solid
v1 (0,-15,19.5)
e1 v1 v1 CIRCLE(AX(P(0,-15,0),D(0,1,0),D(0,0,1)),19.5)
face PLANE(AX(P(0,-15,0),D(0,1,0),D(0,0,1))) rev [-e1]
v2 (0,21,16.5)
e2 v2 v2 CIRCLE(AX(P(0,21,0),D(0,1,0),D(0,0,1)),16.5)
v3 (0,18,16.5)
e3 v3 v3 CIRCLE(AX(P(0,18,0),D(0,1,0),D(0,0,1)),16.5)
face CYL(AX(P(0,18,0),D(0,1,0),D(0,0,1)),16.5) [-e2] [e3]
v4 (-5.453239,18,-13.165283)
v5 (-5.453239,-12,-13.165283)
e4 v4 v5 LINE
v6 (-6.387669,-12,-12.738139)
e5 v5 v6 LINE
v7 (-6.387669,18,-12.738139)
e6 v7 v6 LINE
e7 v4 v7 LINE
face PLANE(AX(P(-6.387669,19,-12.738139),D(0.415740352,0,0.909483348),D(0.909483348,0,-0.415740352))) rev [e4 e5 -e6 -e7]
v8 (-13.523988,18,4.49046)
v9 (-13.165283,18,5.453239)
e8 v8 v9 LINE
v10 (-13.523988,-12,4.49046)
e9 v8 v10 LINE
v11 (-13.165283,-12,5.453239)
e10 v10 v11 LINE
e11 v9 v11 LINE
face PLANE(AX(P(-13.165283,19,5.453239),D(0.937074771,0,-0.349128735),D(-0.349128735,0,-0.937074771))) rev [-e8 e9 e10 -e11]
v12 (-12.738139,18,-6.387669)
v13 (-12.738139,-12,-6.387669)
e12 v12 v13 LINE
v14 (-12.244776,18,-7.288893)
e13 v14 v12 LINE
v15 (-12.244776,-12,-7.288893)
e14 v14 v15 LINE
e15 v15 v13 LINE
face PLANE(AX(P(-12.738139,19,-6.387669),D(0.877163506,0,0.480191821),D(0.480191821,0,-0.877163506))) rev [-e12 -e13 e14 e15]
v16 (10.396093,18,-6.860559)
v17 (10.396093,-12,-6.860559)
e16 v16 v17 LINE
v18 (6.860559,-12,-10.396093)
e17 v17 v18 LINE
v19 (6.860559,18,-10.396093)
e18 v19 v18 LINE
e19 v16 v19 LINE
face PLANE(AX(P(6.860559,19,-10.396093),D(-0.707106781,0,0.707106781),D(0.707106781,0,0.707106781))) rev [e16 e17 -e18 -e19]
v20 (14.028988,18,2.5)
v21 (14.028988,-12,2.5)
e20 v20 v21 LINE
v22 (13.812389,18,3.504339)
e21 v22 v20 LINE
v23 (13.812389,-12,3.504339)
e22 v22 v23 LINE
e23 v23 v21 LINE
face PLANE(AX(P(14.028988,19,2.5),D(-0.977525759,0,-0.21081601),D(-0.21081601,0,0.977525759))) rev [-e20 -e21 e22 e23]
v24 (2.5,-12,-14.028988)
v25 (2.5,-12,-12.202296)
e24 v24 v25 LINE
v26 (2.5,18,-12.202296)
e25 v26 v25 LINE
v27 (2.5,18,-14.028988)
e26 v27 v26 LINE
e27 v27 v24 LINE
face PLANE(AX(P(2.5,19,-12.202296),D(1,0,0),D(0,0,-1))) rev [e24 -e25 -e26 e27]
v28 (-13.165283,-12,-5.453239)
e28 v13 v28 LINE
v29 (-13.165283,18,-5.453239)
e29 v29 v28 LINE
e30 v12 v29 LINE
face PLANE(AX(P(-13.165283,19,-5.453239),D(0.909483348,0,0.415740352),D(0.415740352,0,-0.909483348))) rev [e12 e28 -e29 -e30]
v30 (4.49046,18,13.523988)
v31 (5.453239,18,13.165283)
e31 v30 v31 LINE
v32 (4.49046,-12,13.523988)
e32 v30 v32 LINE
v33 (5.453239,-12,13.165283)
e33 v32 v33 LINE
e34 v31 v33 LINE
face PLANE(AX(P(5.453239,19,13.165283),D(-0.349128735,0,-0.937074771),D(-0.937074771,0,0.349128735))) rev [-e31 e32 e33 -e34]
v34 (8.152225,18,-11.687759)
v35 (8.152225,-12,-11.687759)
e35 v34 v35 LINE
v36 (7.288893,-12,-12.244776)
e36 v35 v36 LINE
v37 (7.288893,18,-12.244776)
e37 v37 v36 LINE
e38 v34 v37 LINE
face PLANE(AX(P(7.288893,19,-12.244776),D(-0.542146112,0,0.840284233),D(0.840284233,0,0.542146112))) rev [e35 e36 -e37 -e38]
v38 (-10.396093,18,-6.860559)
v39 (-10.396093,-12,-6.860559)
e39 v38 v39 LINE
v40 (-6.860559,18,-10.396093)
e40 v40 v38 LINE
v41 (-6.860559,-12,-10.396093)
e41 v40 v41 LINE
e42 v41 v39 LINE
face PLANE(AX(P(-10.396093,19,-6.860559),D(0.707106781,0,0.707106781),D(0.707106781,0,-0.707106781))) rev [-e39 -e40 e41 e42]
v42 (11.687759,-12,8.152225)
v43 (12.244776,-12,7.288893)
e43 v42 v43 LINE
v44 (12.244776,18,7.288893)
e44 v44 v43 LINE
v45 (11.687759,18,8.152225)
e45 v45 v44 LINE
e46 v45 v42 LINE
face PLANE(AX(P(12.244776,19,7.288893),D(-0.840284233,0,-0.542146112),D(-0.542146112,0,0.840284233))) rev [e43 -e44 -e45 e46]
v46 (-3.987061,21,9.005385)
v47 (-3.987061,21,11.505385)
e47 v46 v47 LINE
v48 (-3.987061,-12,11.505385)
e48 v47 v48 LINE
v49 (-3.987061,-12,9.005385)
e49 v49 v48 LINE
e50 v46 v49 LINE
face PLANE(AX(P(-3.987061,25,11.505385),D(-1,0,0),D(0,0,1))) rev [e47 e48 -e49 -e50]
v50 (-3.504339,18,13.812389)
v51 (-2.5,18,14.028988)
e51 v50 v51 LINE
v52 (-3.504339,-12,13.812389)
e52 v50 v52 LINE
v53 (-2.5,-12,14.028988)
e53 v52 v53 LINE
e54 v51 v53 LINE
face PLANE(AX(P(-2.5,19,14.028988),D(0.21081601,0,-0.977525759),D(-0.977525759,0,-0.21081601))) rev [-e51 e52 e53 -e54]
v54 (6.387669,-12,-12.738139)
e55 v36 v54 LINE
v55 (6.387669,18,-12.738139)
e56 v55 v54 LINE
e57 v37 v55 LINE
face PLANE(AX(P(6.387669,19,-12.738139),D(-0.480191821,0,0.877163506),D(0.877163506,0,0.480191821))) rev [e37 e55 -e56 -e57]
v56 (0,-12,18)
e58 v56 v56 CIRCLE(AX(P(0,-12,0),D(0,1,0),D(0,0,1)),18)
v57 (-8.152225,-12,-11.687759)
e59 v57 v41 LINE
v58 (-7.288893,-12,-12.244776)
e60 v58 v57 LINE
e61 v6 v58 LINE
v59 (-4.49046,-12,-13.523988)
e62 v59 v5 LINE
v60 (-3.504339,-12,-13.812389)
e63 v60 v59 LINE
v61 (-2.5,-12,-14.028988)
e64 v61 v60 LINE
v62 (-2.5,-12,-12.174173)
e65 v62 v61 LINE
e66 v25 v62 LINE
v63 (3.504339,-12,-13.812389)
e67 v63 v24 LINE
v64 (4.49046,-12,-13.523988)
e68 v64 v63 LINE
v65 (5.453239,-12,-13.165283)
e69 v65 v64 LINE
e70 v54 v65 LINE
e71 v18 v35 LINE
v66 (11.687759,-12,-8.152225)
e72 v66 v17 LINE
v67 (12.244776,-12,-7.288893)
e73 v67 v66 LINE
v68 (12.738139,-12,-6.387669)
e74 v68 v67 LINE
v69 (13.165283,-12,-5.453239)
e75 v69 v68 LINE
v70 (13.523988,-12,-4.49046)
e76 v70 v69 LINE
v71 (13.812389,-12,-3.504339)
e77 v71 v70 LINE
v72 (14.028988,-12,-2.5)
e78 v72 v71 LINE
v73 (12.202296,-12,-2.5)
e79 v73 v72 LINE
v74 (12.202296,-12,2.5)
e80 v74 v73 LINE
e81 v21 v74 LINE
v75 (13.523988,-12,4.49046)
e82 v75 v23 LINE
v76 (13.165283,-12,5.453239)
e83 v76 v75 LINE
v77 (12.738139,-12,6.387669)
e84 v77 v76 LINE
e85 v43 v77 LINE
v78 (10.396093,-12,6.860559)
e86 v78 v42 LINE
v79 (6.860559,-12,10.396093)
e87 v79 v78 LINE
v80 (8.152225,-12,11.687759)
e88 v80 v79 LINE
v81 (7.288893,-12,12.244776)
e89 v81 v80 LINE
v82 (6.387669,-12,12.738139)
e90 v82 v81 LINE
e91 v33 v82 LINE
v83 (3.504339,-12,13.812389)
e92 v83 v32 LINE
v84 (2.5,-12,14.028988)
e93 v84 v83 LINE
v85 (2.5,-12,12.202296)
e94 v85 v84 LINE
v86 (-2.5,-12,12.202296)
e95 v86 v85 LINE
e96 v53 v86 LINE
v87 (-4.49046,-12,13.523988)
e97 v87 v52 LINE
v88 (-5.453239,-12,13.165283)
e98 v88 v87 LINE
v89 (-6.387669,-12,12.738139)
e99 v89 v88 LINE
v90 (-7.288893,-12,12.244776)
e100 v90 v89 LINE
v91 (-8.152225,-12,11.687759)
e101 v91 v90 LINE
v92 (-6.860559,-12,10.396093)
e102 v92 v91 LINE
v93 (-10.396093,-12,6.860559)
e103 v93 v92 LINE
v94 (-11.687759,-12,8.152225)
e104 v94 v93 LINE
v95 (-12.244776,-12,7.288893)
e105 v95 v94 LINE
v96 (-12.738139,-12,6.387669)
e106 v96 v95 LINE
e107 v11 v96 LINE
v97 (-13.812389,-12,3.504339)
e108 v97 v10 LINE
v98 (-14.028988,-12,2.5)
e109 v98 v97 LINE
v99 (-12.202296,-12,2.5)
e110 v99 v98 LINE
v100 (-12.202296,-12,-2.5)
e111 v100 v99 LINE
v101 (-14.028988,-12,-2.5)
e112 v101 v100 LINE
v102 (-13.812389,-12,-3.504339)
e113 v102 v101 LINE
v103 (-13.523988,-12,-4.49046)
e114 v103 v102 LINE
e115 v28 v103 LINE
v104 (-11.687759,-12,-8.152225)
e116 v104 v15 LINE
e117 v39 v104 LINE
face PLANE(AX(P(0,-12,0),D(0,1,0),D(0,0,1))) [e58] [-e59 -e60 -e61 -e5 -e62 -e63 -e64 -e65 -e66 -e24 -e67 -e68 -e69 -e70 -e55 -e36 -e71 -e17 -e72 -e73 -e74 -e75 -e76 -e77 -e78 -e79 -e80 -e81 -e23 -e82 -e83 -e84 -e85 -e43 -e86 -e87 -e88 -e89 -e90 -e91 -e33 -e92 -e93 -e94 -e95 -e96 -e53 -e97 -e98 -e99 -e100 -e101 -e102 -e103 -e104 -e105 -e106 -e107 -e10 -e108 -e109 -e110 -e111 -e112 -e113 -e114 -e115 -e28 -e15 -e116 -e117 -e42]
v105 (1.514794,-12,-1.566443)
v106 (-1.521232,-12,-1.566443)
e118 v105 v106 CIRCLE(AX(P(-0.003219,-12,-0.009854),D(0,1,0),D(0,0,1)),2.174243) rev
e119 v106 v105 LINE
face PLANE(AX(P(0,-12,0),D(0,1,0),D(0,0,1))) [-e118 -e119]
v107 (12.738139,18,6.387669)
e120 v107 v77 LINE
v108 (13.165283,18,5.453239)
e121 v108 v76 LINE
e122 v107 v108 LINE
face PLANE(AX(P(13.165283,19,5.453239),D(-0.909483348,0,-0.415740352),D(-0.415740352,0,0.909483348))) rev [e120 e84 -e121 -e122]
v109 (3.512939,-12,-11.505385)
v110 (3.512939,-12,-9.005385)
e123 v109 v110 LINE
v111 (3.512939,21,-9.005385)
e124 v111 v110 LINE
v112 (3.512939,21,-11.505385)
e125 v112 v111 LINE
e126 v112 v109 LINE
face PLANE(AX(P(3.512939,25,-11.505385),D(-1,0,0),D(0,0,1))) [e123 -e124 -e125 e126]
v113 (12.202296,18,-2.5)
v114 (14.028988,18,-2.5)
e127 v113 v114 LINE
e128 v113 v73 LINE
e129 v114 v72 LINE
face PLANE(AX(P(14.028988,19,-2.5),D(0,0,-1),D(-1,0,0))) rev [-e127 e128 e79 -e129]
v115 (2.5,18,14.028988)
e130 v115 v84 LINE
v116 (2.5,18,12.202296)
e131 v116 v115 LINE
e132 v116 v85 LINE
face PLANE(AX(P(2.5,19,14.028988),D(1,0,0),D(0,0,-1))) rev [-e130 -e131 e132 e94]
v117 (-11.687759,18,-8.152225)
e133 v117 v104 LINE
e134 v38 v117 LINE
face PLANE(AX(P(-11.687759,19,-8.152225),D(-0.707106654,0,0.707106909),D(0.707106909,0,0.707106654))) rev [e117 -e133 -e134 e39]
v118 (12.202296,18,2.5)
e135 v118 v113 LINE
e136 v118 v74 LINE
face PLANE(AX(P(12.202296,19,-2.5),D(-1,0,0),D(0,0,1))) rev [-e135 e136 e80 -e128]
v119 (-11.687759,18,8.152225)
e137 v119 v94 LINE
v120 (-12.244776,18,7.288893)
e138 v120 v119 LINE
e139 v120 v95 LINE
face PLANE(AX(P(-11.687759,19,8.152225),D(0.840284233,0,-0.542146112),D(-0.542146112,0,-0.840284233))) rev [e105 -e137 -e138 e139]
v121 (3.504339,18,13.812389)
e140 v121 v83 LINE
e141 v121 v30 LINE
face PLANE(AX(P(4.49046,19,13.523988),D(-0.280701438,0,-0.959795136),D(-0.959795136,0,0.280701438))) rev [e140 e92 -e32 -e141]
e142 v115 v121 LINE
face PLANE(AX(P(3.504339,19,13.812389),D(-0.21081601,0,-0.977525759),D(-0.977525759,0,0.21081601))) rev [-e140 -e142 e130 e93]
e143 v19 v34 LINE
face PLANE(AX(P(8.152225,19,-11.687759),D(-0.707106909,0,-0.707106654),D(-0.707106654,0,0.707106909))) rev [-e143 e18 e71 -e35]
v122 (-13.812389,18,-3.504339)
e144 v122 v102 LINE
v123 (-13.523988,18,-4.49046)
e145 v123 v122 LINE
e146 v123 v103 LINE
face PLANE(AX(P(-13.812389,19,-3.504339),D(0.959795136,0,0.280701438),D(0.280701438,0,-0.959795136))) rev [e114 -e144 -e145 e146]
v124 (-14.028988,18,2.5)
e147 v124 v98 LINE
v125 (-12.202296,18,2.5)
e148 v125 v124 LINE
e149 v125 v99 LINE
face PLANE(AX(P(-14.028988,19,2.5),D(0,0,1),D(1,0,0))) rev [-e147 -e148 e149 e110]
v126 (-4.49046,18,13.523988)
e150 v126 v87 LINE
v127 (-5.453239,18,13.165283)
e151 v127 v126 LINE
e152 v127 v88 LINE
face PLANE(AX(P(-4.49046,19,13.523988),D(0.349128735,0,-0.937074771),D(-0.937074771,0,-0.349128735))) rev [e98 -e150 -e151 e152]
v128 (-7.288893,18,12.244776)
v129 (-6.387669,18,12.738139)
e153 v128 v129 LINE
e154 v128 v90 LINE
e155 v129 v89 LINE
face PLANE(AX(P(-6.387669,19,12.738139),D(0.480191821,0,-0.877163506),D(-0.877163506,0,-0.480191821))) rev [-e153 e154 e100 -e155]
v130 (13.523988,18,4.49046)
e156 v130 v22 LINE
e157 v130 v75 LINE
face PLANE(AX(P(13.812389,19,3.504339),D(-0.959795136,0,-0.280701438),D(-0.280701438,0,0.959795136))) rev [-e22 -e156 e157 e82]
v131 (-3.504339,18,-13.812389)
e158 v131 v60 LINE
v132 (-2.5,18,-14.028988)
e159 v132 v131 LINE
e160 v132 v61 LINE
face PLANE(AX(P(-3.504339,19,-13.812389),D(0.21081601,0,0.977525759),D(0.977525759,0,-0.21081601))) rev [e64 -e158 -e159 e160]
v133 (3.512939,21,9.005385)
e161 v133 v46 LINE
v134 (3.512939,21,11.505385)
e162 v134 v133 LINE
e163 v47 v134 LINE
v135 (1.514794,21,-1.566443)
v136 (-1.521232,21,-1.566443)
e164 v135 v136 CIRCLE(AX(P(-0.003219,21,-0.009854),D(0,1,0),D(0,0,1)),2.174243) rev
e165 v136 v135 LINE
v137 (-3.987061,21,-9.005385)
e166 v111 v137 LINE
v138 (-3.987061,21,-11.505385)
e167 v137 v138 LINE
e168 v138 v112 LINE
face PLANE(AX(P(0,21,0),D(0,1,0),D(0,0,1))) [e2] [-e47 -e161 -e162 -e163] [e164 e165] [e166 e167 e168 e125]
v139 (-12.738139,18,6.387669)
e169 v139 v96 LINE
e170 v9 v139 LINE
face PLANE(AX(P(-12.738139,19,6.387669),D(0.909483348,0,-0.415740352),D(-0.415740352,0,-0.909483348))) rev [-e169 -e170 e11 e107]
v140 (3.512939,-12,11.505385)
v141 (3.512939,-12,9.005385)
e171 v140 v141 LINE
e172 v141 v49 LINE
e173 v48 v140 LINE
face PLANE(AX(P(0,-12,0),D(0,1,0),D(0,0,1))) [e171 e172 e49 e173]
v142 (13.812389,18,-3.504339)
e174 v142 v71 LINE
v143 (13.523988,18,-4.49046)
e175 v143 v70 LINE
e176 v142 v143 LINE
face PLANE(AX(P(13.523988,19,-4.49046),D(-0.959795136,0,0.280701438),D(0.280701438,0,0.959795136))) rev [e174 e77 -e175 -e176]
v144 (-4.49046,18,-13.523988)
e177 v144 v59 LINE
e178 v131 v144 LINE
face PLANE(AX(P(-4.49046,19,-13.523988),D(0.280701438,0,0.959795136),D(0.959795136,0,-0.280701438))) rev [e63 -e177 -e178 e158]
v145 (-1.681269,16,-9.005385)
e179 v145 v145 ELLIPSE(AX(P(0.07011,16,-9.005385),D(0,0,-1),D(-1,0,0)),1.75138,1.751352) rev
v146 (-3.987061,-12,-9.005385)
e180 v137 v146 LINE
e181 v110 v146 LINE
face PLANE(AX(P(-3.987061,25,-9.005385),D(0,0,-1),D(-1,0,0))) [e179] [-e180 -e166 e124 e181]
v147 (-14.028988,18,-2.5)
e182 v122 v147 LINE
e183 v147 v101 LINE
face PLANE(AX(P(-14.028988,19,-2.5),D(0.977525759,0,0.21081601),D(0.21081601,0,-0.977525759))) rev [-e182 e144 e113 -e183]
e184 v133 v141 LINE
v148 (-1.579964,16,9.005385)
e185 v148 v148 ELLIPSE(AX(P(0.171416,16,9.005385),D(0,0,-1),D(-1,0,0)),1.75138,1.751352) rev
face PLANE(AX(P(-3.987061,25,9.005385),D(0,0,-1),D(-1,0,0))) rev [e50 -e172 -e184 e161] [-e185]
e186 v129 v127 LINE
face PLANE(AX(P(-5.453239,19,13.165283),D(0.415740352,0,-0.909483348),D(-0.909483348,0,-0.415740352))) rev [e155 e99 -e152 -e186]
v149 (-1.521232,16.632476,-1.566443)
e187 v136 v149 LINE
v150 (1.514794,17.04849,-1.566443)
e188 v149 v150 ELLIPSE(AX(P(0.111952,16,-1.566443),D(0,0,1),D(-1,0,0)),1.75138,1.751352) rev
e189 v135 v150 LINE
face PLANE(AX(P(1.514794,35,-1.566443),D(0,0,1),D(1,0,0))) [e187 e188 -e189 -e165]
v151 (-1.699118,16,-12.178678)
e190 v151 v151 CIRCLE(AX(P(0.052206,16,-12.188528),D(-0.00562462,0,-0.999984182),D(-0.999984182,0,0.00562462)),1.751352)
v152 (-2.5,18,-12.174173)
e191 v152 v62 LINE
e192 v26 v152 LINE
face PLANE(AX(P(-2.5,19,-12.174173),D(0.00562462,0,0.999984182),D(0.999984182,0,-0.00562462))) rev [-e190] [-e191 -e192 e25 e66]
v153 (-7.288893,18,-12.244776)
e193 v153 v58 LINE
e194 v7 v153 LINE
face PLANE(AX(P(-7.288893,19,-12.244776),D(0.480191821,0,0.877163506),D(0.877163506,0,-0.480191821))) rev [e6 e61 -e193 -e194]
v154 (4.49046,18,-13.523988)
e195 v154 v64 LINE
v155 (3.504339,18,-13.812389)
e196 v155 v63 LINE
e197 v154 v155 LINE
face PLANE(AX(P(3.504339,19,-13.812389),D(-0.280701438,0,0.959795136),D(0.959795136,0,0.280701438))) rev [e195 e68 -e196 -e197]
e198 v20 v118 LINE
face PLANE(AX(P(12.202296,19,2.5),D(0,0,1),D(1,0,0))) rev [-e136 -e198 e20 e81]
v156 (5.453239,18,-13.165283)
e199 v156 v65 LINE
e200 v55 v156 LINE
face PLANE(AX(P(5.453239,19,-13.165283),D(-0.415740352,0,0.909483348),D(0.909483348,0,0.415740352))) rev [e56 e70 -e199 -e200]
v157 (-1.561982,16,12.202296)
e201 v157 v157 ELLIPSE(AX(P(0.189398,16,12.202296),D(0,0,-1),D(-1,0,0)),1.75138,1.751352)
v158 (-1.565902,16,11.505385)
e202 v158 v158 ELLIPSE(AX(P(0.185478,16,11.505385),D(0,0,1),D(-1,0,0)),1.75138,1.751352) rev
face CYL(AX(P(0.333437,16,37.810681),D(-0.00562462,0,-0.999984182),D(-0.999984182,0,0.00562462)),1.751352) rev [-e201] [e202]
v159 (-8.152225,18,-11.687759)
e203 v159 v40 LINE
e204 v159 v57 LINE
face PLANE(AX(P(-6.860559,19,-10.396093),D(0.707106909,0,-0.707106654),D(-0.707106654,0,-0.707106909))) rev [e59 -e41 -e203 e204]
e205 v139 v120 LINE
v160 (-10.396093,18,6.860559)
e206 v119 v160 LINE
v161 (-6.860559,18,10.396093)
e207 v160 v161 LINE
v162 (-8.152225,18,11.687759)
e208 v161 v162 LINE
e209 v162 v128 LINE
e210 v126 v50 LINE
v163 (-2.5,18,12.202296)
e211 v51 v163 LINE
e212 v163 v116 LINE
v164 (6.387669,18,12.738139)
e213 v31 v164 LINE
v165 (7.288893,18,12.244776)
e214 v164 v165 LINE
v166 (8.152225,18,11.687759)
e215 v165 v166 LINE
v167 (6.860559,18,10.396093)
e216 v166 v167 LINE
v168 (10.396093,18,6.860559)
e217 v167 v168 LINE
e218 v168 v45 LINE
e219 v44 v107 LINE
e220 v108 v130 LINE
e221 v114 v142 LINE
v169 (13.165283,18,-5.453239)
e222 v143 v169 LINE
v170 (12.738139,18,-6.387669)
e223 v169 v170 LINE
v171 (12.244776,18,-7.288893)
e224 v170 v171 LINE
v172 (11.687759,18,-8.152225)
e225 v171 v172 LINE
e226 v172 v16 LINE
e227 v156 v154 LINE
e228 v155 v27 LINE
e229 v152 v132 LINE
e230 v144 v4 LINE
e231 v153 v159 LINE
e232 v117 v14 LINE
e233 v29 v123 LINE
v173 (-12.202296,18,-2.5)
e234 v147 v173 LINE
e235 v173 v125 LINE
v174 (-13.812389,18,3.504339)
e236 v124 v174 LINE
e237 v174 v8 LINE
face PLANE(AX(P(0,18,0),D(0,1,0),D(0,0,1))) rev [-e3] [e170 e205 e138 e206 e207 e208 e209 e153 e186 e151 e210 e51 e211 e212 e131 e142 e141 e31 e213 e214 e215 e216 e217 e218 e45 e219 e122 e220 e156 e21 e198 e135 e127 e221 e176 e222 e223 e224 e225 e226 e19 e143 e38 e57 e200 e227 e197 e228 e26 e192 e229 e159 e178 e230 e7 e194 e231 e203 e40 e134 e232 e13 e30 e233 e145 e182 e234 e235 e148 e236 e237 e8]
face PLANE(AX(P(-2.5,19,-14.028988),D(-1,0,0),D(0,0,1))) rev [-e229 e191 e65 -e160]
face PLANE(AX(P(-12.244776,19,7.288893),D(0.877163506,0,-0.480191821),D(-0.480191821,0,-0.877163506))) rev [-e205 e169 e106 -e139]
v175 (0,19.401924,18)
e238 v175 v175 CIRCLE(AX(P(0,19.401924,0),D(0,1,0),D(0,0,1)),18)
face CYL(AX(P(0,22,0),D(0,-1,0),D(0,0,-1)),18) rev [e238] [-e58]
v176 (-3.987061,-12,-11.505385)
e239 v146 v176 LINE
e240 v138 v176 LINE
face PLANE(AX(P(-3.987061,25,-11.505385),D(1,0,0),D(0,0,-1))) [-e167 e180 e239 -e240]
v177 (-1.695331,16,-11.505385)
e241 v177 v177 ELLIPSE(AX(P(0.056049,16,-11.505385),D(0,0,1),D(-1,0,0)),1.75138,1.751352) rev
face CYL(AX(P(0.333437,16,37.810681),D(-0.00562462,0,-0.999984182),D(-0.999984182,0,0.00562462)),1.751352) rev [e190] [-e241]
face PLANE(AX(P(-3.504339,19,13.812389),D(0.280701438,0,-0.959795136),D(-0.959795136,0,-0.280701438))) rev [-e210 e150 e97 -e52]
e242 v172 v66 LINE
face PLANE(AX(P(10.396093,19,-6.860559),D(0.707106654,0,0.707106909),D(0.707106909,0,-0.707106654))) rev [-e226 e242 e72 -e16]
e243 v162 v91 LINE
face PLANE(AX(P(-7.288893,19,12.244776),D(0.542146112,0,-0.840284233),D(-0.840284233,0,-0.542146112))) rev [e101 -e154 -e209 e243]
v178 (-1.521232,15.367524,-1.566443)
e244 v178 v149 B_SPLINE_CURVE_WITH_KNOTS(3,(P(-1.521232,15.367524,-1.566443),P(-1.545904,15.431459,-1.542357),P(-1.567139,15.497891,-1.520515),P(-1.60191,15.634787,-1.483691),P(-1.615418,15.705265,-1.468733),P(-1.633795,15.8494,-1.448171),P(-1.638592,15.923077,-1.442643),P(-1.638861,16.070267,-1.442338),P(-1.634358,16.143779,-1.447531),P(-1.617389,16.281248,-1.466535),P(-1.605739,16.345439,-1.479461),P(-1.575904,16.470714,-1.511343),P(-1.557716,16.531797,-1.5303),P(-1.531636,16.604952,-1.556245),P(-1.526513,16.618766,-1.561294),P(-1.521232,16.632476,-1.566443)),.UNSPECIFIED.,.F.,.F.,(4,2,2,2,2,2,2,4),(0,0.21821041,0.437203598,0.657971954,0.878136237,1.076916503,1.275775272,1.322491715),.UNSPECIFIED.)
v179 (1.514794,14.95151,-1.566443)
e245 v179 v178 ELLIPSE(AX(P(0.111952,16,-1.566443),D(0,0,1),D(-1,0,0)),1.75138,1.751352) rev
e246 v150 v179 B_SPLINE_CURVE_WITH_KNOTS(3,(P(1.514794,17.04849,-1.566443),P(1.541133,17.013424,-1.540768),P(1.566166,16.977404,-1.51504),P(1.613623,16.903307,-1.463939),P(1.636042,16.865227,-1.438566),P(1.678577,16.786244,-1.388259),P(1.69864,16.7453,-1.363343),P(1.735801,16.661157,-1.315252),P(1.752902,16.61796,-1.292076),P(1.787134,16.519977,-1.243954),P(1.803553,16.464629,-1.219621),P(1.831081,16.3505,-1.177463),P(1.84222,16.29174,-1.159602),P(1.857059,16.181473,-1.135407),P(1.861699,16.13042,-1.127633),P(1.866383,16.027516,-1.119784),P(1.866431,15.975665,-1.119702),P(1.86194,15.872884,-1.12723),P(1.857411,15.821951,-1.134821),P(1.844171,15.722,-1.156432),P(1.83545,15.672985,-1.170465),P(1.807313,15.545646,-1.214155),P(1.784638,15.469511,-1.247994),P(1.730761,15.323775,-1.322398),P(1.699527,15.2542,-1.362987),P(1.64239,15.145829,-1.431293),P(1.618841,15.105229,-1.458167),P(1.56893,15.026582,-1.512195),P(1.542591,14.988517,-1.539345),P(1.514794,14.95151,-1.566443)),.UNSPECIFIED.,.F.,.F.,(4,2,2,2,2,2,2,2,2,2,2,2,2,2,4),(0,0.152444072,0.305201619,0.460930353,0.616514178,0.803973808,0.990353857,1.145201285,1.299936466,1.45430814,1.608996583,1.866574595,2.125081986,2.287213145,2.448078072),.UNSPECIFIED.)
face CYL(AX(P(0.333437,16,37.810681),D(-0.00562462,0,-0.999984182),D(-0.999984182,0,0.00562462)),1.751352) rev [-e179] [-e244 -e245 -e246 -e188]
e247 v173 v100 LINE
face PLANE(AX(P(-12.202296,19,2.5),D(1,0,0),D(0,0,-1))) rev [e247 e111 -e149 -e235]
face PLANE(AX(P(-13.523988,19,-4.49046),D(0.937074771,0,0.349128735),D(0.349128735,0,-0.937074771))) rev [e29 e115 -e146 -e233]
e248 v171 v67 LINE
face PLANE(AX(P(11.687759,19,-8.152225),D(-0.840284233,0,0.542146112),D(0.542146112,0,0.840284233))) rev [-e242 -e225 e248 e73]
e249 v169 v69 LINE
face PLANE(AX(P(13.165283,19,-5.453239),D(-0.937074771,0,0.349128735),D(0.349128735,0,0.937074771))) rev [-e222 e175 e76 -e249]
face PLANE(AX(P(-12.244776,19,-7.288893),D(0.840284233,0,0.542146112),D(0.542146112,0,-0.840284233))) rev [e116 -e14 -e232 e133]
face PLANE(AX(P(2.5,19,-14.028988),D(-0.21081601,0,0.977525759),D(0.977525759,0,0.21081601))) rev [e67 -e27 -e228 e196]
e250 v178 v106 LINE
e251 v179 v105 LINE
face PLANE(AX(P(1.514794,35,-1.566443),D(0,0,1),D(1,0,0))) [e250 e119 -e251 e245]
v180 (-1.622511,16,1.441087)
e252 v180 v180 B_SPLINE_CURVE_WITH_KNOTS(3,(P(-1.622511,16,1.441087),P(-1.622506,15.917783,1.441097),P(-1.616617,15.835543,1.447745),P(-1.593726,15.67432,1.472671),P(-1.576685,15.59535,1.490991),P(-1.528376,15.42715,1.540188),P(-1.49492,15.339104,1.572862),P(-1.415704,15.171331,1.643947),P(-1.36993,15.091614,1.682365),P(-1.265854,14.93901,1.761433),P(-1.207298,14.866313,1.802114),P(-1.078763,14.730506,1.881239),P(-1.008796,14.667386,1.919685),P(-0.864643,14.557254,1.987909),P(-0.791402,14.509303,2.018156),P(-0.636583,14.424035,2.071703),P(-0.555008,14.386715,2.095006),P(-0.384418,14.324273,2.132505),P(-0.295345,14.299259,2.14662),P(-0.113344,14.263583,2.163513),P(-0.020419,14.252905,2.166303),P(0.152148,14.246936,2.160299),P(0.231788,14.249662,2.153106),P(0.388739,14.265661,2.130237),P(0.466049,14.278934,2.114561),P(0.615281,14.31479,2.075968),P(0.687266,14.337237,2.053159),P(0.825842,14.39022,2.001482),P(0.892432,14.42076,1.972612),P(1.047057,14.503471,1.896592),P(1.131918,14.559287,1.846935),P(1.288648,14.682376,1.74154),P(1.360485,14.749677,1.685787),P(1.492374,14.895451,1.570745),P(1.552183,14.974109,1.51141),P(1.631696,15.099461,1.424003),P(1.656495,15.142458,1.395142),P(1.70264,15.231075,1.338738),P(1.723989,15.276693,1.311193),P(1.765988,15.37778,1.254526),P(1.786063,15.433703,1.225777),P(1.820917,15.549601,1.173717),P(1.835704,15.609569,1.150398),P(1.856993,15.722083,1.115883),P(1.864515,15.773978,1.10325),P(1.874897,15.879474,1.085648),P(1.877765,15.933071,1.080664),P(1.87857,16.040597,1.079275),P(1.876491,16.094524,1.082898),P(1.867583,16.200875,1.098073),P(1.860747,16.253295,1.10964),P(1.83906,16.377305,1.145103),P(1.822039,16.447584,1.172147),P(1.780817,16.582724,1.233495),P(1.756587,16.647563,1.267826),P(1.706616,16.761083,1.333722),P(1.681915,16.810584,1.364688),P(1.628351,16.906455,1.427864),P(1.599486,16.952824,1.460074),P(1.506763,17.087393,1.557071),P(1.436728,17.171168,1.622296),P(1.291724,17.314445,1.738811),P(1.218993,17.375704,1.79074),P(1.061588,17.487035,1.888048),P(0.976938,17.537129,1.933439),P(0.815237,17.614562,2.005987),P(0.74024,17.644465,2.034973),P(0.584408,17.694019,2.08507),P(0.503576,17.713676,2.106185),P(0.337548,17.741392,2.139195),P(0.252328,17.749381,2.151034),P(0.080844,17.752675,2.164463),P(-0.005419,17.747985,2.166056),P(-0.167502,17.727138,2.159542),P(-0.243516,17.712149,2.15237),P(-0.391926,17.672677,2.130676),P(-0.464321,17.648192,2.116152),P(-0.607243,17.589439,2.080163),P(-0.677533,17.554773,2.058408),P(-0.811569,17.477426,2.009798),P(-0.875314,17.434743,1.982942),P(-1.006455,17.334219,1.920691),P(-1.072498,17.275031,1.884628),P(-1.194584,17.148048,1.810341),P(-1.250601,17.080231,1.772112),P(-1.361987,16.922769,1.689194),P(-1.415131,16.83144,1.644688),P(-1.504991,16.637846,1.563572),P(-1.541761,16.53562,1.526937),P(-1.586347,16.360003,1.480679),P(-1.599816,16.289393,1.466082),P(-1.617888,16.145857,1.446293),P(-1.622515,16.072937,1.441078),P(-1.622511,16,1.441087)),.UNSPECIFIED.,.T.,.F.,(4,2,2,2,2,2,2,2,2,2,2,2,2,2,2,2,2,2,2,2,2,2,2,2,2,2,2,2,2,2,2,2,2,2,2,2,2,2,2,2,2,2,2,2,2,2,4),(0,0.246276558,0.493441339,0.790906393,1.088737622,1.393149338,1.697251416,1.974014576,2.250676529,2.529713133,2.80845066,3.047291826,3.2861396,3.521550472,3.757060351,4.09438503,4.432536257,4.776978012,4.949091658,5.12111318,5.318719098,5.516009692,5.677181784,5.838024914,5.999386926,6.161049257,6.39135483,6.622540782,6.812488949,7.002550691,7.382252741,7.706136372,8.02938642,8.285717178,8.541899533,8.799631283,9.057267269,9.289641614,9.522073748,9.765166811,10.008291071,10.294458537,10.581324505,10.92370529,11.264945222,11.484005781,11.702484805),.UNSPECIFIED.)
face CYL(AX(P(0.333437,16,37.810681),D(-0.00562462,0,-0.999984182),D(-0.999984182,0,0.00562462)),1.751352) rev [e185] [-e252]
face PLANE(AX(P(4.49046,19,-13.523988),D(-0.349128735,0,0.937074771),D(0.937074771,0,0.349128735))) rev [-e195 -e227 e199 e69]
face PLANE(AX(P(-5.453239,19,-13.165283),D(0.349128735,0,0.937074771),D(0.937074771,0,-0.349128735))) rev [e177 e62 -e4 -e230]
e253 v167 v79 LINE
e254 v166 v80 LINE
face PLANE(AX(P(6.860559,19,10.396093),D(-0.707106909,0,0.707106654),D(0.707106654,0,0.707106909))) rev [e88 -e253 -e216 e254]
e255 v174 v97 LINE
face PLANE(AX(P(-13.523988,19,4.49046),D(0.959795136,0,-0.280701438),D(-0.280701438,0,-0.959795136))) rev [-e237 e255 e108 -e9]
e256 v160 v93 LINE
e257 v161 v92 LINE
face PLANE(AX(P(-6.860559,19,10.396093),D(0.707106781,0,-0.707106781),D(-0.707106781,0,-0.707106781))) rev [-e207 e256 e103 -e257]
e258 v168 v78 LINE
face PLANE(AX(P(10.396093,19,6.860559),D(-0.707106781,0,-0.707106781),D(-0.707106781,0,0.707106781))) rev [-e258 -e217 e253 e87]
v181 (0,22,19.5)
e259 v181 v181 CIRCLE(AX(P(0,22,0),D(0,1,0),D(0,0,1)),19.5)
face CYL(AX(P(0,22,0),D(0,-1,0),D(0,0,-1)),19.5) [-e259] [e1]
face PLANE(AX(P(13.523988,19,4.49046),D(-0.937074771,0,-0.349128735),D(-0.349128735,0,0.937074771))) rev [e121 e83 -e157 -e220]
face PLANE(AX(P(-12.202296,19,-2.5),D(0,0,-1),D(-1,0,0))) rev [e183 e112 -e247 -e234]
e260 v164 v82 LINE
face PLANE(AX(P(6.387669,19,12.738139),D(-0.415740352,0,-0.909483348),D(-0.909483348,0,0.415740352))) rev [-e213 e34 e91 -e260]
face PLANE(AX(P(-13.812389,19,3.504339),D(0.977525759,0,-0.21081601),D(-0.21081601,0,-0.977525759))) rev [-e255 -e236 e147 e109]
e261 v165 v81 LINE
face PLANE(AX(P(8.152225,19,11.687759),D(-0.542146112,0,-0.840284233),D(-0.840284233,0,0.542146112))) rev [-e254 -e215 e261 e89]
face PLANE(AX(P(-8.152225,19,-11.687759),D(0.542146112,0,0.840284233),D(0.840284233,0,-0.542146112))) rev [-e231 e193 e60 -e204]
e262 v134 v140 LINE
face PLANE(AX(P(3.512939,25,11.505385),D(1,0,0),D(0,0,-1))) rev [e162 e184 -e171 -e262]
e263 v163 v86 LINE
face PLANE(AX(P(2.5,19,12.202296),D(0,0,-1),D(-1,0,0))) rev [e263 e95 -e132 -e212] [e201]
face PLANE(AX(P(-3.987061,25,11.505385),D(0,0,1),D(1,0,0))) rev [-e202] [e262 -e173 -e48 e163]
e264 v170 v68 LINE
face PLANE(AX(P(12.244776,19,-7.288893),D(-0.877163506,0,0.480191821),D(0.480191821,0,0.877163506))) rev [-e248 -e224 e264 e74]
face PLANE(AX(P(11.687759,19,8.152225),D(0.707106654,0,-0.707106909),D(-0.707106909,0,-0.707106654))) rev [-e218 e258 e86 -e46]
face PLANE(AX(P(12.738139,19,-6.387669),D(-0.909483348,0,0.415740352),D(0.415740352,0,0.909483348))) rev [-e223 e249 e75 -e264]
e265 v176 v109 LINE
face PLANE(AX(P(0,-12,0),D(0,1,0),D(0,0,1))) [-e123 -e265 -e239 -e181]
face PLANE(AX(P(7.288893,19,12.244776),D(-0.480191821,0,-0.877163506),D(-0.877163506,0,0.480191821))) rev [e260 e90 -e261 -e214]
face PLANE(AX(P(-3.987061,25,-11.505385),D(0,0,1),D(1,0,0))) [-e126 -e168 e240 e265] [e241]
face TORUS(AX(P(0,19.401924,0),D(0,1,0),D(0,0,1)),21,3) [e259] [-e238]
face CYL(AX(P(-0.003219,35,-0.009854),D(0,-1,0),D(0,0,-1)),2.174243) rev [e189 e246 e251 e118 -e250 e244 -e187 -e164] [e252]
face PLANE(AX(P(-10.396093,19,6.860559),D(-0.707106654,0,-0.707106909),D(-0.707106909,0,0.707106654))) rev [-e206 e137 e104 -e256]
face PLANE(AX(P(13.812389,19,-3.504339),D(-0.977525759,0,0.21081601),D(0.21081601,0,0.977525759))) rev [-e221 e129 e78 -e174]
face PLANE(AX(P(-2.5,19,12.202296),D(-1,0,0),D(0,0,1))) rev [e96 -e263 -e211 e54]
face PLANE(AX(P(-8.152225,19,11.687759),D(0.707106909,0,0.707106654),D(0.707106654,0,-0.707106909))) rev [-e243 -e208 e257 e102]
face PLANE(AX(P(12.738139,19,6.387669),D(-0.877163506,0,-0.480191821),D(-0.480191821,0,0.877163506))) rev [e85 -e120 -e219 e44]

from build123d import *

# Parameters (mm, degrees)
SKETCH1_R           = 17
BOSS_EXTRUDE1_DEPTH = 3
SKETCH3_R           = 17
BOSS_EXTRUDE2_DEPTH = 3
BOSS_EXTRUDE3_DEPTH = 31
SKETCH7_R           = 1.751351815
CUT_EXTRUDE11_DEPTH = 50
CUT_EXTRUDE1_DEPTH  = 50
SKETCH8_W           = 7.5
SKETCH8_H           = 2.5
CUT_EXTRUDE12_DEPTH = 40
SKETCH9_R           = 19.5
SKETCH9_R_2         = 18
BOSS_EXTRUDE4_DEPTH = 37
FILLET1_R           = 3
SKETCH10_R          = 17
SKETCH10_R_2        = 16.5
CUT_EXTRUDE13_DEPTH = 3
SKETCH11_R          = 19.5
BOSS_EXTRUDE5_DEPTH = 3


with BuildPart() as part:
    # Sketch1 → Boss-Extrude1 (new body)
    with BuildSketch(Plane(origin=(0, -15, 0), x_dir=(1, 0, 0), z_dir=(0, 1, 0))):
        with Locations(Location((0, 0, 0), (0, 0, 270))):
            Circle(SKETCH1_R)
    extrude(amount=BOSS_EXTRUDE1_DEPTH)



with BuildPart() as body_2:
    # Sketch3 → Boss-Extrude2 (new body)
    with BuildSketch(Plane(origin=(0, 21, 0), x_dir=(1, 0, 0), z_dir=(0, 1, 0))):
        with Locations(Location((0, 0, 0), (0, 0, 270))):
            Circle(SKETCH3_R)
    extrude(amount=-BOSS_EXTRUDE2_DEPTH)


with BuildPart() as part_1:
    add(part.part)

    add(body_2.part)  # Boss-Extrude3 merges body 2
    # Sketch6 → Boss-Extrude3 (add)
    with BuildSketch(Plane(origin=(0, -12, 0), x_dir=(1, 0, 0), z_dir=(0, 1, 0))):
        Polygon((-10.39609313, -6.860559341), (-11.68775931, -8.152225055), (-12.244775891, -7.288892753), (-12.738139369, -6.387668662), (-13.165283017, -5.453239195), (-13.523988426, -4.490460269), (-13.812389225, -3.504338907), (-14.028987847, -2.499999944), (-12.202296406, -2.499999944), (-12.202296406, 2.499999944), (-14.028987847, 2.499999944), (-13.812389225, 3.504338907), (-13.523988426, 4.490460269), (-13.165283017, 5.453239195), (-12.738139369, 6.387668662), (-12.244775891, 7.288892753), (-11.68775931, 8.152225055), (-10.39609313, 6.860559341), (-6.860559341, 10.39609313), (-8.152225055, 11.68775931), (-7.288892753, 12.244775891), (-6.387668662, 12.738139369), (-5.453239195, 13.165283017), (-4.490460269, 13.523988426), (-3.504338907, 13.812389225), (-2.499999944, 14.028987847), (-2.499999944, 12.174172863), (2.499999944, 12.202296406), (2.499999944, 14.028987847), (3.504338907, 13.812389225), (4.490460269, 13.523988426), (5.453239195, 13.165283017), (6.387668662, 12.738139369), (7.288892753, 12.244775891), (8.152225055, 11.68775931), (6.860559341, 10.39609313), (10.39609313, 6.860559341), (11.68775931, 8.152225055), (12.244775891, 7.288892753), (12.738139369, 6.387668662), (13.165283017, 5.453239195), (13.523988426, 4.490460269), (13.812389225, 3.504338907), (14.028987847, 2.499999944), (12.202296406, 2.499999944), (12.202296406, -2.499999944), (14.028987847, -2.499999944), (13.812389225, -3.504338907), (13.523988426, -4.490460269), (13.165283017, -5.453239195), (12.738139369, -6.387668662), (12.244775891, -7.288892753), (11.68775931, -8.152225055), (10.39609313, -6.860559341), (6.860559341, -10.39609313), (8.152225055, -11.68775931), (7.288892753, -12.244775891), (6.387668662, -12.738139369), (5.453239195, -13.165283017), (4.490460269, -13.523988426), (3.504338907, -13.812389225), (2.499999944, -14.028987847), (2.499999944, -12.202296406), (-2.499999944, -12.202296406), (-2.499999944, -14.028987847), (-3.504338907, -13.812389225), (-4.490460269, -13.523988426), (-5.453239195, -13.165283017), (-6.387668662, -12.738139369), (-7.288892753, -12.244775891), (-8.152225055, -11.68775931), (-6.860559341, -10.39609313), align=None)
    extrude(amount=BOSS_EXTRUDE3_DEPTH)

    # Sketch7 → Cut-Extrude11 (cut)
    with BuildSketch(Plane(origin=(-0.068553102, 0, -12.187849043), x_dir=(-0.9999841817006155, 0, 0.005624619858302935), z_dir=(-0.005624619858302935, 0, -0.9999841817006155))):
        with Locations((-0.120761258, 16)):
            Circle(SKETCH7_R)
    extrude(amount=-CUT_EXTRUDE11_DEPTH, mode=Mode.SUBTRACT)

    # Sketch2 → Cut-Extrude1 (cut)
    with BuildSketch(Plane(origin=(0, -15, 0), x_dir=(1, 0, 0), z_dir=(0, 1, 0))):
        with BuildLine():
            Line((1.514793699, 1.566442938), (-1.521232282, 1.566442938))
            ThreePointArc((-1.521232282, 1.566442938), (-0.003219291, -2.164389177), (1.514793699, 1.566442938))
        make_face()
    extrude(amount=CUT_EXTRUDE1_DEPTH, mode=Mode.SUBTRACT)

    # Sketch8 → Cut-Extrude12 (cut)
    with BuildSketch(Plane(origin=(0, -15, 0), x_dir=(1, 0, 0), z_dir=(0, 1, 0))):
        with Locations((-0.237061367, 10.255385433)):
            Rectangle(SKETCH8_W, SKETCH8_H)
    cut_extrude12 = extrude(amount=CUT_EXTRUDE12_DEPTH, mode=Mode.SUBTRACT)

    # Mirror1: Cut-Extrude12 across plane
    add(cut_extrude12.mirror(Plane.XY), mode=Mode.SUBTRACT)

    # Sketch10 → Cut-Extrude13 (cut)
    with BuildSketch(Plane(origin=(0, 21, 0), x_dir=(1, 0, 0), z_dir=(0, 1, 0))):
        with Locations(Location((0, 0, 0), (0, 0, 270))):
            Circle(SKETCH10_R)
        with Locations(Location((0, 0, 0), (0, 0, 270))):
            Circle(SKETCH10_R_2, mode=Mode.SUBTRACT)
    extrude(amount=-CUT_EXTRUDE13_DEPTH, mode=Mode.SUBTRACT)



with BuildPart() as body_2_2:
    # Sketch9 → Boss-Extrude4 (new body)
    with BuildSketch(Plane(origin=(0, -15, 0), x_dir=(1, 0, 0), z_dir=(0, 1, 0))):
        with Locations(Location((0, 0, 0), (0, 0, 270))):
            Circle(SKETCH9_R)
        with Locations(Location((0, 0, 0), (0, 0, 270))):
            Circle(SKETCH9_R_2, mode=Mode.SUBTRACT)
    extrude(amount=BOSS_EXTRUDE4_DEPTH)

    # Fillet1
    # the kernel refuses this fillet: 3 mm, written as the material it takes off along each edge
    with BuildSketch(Plane(origin=(0, 22, 0), x_dir=(0, 0, 1), z_dir=(-1, 0, 0))) as fillet1_piece_1:
        with BuildLine():
            CenterArc((21, -2.598076211), FILLET1_R, 120, 60)
            Line((19.5, 0), (19.47, 0.051961524))
            ThreePointArc((19.47, 0.051961524), (18.75, 0.06), (18, 0.06))
            Line((18, 0.06), (17.94, 0))
            Line((17.94, 0), (17.94, -2.598076211))
            Line((17.94, -2.598076211), (18, -2.598076211))
        make_face()
    revolve(axis=Axis((0, 22, 0), (0, 1, 0)), mode=Mode.SUBTRACT)


with BuildPart() as part_2:
    add(part_1.part)

    add(body_2_2.part)  # Boss-Extrude5 merges body 2 2
    # Sketch11 → Boss-Extrude5 (add)
    with BuildSketch(Plane(origin=(0, -15, 0), x_dir=(1, 0, 0), z_dir=(0, 1, 0))):
        with Locations(Location((0, 0, 0), (0, 0, 270))):
            Circle(SKETCH11_R)
    extrude(amount=BOSS_EXTRUDE5_DEPTH)


solid = part_2.part
